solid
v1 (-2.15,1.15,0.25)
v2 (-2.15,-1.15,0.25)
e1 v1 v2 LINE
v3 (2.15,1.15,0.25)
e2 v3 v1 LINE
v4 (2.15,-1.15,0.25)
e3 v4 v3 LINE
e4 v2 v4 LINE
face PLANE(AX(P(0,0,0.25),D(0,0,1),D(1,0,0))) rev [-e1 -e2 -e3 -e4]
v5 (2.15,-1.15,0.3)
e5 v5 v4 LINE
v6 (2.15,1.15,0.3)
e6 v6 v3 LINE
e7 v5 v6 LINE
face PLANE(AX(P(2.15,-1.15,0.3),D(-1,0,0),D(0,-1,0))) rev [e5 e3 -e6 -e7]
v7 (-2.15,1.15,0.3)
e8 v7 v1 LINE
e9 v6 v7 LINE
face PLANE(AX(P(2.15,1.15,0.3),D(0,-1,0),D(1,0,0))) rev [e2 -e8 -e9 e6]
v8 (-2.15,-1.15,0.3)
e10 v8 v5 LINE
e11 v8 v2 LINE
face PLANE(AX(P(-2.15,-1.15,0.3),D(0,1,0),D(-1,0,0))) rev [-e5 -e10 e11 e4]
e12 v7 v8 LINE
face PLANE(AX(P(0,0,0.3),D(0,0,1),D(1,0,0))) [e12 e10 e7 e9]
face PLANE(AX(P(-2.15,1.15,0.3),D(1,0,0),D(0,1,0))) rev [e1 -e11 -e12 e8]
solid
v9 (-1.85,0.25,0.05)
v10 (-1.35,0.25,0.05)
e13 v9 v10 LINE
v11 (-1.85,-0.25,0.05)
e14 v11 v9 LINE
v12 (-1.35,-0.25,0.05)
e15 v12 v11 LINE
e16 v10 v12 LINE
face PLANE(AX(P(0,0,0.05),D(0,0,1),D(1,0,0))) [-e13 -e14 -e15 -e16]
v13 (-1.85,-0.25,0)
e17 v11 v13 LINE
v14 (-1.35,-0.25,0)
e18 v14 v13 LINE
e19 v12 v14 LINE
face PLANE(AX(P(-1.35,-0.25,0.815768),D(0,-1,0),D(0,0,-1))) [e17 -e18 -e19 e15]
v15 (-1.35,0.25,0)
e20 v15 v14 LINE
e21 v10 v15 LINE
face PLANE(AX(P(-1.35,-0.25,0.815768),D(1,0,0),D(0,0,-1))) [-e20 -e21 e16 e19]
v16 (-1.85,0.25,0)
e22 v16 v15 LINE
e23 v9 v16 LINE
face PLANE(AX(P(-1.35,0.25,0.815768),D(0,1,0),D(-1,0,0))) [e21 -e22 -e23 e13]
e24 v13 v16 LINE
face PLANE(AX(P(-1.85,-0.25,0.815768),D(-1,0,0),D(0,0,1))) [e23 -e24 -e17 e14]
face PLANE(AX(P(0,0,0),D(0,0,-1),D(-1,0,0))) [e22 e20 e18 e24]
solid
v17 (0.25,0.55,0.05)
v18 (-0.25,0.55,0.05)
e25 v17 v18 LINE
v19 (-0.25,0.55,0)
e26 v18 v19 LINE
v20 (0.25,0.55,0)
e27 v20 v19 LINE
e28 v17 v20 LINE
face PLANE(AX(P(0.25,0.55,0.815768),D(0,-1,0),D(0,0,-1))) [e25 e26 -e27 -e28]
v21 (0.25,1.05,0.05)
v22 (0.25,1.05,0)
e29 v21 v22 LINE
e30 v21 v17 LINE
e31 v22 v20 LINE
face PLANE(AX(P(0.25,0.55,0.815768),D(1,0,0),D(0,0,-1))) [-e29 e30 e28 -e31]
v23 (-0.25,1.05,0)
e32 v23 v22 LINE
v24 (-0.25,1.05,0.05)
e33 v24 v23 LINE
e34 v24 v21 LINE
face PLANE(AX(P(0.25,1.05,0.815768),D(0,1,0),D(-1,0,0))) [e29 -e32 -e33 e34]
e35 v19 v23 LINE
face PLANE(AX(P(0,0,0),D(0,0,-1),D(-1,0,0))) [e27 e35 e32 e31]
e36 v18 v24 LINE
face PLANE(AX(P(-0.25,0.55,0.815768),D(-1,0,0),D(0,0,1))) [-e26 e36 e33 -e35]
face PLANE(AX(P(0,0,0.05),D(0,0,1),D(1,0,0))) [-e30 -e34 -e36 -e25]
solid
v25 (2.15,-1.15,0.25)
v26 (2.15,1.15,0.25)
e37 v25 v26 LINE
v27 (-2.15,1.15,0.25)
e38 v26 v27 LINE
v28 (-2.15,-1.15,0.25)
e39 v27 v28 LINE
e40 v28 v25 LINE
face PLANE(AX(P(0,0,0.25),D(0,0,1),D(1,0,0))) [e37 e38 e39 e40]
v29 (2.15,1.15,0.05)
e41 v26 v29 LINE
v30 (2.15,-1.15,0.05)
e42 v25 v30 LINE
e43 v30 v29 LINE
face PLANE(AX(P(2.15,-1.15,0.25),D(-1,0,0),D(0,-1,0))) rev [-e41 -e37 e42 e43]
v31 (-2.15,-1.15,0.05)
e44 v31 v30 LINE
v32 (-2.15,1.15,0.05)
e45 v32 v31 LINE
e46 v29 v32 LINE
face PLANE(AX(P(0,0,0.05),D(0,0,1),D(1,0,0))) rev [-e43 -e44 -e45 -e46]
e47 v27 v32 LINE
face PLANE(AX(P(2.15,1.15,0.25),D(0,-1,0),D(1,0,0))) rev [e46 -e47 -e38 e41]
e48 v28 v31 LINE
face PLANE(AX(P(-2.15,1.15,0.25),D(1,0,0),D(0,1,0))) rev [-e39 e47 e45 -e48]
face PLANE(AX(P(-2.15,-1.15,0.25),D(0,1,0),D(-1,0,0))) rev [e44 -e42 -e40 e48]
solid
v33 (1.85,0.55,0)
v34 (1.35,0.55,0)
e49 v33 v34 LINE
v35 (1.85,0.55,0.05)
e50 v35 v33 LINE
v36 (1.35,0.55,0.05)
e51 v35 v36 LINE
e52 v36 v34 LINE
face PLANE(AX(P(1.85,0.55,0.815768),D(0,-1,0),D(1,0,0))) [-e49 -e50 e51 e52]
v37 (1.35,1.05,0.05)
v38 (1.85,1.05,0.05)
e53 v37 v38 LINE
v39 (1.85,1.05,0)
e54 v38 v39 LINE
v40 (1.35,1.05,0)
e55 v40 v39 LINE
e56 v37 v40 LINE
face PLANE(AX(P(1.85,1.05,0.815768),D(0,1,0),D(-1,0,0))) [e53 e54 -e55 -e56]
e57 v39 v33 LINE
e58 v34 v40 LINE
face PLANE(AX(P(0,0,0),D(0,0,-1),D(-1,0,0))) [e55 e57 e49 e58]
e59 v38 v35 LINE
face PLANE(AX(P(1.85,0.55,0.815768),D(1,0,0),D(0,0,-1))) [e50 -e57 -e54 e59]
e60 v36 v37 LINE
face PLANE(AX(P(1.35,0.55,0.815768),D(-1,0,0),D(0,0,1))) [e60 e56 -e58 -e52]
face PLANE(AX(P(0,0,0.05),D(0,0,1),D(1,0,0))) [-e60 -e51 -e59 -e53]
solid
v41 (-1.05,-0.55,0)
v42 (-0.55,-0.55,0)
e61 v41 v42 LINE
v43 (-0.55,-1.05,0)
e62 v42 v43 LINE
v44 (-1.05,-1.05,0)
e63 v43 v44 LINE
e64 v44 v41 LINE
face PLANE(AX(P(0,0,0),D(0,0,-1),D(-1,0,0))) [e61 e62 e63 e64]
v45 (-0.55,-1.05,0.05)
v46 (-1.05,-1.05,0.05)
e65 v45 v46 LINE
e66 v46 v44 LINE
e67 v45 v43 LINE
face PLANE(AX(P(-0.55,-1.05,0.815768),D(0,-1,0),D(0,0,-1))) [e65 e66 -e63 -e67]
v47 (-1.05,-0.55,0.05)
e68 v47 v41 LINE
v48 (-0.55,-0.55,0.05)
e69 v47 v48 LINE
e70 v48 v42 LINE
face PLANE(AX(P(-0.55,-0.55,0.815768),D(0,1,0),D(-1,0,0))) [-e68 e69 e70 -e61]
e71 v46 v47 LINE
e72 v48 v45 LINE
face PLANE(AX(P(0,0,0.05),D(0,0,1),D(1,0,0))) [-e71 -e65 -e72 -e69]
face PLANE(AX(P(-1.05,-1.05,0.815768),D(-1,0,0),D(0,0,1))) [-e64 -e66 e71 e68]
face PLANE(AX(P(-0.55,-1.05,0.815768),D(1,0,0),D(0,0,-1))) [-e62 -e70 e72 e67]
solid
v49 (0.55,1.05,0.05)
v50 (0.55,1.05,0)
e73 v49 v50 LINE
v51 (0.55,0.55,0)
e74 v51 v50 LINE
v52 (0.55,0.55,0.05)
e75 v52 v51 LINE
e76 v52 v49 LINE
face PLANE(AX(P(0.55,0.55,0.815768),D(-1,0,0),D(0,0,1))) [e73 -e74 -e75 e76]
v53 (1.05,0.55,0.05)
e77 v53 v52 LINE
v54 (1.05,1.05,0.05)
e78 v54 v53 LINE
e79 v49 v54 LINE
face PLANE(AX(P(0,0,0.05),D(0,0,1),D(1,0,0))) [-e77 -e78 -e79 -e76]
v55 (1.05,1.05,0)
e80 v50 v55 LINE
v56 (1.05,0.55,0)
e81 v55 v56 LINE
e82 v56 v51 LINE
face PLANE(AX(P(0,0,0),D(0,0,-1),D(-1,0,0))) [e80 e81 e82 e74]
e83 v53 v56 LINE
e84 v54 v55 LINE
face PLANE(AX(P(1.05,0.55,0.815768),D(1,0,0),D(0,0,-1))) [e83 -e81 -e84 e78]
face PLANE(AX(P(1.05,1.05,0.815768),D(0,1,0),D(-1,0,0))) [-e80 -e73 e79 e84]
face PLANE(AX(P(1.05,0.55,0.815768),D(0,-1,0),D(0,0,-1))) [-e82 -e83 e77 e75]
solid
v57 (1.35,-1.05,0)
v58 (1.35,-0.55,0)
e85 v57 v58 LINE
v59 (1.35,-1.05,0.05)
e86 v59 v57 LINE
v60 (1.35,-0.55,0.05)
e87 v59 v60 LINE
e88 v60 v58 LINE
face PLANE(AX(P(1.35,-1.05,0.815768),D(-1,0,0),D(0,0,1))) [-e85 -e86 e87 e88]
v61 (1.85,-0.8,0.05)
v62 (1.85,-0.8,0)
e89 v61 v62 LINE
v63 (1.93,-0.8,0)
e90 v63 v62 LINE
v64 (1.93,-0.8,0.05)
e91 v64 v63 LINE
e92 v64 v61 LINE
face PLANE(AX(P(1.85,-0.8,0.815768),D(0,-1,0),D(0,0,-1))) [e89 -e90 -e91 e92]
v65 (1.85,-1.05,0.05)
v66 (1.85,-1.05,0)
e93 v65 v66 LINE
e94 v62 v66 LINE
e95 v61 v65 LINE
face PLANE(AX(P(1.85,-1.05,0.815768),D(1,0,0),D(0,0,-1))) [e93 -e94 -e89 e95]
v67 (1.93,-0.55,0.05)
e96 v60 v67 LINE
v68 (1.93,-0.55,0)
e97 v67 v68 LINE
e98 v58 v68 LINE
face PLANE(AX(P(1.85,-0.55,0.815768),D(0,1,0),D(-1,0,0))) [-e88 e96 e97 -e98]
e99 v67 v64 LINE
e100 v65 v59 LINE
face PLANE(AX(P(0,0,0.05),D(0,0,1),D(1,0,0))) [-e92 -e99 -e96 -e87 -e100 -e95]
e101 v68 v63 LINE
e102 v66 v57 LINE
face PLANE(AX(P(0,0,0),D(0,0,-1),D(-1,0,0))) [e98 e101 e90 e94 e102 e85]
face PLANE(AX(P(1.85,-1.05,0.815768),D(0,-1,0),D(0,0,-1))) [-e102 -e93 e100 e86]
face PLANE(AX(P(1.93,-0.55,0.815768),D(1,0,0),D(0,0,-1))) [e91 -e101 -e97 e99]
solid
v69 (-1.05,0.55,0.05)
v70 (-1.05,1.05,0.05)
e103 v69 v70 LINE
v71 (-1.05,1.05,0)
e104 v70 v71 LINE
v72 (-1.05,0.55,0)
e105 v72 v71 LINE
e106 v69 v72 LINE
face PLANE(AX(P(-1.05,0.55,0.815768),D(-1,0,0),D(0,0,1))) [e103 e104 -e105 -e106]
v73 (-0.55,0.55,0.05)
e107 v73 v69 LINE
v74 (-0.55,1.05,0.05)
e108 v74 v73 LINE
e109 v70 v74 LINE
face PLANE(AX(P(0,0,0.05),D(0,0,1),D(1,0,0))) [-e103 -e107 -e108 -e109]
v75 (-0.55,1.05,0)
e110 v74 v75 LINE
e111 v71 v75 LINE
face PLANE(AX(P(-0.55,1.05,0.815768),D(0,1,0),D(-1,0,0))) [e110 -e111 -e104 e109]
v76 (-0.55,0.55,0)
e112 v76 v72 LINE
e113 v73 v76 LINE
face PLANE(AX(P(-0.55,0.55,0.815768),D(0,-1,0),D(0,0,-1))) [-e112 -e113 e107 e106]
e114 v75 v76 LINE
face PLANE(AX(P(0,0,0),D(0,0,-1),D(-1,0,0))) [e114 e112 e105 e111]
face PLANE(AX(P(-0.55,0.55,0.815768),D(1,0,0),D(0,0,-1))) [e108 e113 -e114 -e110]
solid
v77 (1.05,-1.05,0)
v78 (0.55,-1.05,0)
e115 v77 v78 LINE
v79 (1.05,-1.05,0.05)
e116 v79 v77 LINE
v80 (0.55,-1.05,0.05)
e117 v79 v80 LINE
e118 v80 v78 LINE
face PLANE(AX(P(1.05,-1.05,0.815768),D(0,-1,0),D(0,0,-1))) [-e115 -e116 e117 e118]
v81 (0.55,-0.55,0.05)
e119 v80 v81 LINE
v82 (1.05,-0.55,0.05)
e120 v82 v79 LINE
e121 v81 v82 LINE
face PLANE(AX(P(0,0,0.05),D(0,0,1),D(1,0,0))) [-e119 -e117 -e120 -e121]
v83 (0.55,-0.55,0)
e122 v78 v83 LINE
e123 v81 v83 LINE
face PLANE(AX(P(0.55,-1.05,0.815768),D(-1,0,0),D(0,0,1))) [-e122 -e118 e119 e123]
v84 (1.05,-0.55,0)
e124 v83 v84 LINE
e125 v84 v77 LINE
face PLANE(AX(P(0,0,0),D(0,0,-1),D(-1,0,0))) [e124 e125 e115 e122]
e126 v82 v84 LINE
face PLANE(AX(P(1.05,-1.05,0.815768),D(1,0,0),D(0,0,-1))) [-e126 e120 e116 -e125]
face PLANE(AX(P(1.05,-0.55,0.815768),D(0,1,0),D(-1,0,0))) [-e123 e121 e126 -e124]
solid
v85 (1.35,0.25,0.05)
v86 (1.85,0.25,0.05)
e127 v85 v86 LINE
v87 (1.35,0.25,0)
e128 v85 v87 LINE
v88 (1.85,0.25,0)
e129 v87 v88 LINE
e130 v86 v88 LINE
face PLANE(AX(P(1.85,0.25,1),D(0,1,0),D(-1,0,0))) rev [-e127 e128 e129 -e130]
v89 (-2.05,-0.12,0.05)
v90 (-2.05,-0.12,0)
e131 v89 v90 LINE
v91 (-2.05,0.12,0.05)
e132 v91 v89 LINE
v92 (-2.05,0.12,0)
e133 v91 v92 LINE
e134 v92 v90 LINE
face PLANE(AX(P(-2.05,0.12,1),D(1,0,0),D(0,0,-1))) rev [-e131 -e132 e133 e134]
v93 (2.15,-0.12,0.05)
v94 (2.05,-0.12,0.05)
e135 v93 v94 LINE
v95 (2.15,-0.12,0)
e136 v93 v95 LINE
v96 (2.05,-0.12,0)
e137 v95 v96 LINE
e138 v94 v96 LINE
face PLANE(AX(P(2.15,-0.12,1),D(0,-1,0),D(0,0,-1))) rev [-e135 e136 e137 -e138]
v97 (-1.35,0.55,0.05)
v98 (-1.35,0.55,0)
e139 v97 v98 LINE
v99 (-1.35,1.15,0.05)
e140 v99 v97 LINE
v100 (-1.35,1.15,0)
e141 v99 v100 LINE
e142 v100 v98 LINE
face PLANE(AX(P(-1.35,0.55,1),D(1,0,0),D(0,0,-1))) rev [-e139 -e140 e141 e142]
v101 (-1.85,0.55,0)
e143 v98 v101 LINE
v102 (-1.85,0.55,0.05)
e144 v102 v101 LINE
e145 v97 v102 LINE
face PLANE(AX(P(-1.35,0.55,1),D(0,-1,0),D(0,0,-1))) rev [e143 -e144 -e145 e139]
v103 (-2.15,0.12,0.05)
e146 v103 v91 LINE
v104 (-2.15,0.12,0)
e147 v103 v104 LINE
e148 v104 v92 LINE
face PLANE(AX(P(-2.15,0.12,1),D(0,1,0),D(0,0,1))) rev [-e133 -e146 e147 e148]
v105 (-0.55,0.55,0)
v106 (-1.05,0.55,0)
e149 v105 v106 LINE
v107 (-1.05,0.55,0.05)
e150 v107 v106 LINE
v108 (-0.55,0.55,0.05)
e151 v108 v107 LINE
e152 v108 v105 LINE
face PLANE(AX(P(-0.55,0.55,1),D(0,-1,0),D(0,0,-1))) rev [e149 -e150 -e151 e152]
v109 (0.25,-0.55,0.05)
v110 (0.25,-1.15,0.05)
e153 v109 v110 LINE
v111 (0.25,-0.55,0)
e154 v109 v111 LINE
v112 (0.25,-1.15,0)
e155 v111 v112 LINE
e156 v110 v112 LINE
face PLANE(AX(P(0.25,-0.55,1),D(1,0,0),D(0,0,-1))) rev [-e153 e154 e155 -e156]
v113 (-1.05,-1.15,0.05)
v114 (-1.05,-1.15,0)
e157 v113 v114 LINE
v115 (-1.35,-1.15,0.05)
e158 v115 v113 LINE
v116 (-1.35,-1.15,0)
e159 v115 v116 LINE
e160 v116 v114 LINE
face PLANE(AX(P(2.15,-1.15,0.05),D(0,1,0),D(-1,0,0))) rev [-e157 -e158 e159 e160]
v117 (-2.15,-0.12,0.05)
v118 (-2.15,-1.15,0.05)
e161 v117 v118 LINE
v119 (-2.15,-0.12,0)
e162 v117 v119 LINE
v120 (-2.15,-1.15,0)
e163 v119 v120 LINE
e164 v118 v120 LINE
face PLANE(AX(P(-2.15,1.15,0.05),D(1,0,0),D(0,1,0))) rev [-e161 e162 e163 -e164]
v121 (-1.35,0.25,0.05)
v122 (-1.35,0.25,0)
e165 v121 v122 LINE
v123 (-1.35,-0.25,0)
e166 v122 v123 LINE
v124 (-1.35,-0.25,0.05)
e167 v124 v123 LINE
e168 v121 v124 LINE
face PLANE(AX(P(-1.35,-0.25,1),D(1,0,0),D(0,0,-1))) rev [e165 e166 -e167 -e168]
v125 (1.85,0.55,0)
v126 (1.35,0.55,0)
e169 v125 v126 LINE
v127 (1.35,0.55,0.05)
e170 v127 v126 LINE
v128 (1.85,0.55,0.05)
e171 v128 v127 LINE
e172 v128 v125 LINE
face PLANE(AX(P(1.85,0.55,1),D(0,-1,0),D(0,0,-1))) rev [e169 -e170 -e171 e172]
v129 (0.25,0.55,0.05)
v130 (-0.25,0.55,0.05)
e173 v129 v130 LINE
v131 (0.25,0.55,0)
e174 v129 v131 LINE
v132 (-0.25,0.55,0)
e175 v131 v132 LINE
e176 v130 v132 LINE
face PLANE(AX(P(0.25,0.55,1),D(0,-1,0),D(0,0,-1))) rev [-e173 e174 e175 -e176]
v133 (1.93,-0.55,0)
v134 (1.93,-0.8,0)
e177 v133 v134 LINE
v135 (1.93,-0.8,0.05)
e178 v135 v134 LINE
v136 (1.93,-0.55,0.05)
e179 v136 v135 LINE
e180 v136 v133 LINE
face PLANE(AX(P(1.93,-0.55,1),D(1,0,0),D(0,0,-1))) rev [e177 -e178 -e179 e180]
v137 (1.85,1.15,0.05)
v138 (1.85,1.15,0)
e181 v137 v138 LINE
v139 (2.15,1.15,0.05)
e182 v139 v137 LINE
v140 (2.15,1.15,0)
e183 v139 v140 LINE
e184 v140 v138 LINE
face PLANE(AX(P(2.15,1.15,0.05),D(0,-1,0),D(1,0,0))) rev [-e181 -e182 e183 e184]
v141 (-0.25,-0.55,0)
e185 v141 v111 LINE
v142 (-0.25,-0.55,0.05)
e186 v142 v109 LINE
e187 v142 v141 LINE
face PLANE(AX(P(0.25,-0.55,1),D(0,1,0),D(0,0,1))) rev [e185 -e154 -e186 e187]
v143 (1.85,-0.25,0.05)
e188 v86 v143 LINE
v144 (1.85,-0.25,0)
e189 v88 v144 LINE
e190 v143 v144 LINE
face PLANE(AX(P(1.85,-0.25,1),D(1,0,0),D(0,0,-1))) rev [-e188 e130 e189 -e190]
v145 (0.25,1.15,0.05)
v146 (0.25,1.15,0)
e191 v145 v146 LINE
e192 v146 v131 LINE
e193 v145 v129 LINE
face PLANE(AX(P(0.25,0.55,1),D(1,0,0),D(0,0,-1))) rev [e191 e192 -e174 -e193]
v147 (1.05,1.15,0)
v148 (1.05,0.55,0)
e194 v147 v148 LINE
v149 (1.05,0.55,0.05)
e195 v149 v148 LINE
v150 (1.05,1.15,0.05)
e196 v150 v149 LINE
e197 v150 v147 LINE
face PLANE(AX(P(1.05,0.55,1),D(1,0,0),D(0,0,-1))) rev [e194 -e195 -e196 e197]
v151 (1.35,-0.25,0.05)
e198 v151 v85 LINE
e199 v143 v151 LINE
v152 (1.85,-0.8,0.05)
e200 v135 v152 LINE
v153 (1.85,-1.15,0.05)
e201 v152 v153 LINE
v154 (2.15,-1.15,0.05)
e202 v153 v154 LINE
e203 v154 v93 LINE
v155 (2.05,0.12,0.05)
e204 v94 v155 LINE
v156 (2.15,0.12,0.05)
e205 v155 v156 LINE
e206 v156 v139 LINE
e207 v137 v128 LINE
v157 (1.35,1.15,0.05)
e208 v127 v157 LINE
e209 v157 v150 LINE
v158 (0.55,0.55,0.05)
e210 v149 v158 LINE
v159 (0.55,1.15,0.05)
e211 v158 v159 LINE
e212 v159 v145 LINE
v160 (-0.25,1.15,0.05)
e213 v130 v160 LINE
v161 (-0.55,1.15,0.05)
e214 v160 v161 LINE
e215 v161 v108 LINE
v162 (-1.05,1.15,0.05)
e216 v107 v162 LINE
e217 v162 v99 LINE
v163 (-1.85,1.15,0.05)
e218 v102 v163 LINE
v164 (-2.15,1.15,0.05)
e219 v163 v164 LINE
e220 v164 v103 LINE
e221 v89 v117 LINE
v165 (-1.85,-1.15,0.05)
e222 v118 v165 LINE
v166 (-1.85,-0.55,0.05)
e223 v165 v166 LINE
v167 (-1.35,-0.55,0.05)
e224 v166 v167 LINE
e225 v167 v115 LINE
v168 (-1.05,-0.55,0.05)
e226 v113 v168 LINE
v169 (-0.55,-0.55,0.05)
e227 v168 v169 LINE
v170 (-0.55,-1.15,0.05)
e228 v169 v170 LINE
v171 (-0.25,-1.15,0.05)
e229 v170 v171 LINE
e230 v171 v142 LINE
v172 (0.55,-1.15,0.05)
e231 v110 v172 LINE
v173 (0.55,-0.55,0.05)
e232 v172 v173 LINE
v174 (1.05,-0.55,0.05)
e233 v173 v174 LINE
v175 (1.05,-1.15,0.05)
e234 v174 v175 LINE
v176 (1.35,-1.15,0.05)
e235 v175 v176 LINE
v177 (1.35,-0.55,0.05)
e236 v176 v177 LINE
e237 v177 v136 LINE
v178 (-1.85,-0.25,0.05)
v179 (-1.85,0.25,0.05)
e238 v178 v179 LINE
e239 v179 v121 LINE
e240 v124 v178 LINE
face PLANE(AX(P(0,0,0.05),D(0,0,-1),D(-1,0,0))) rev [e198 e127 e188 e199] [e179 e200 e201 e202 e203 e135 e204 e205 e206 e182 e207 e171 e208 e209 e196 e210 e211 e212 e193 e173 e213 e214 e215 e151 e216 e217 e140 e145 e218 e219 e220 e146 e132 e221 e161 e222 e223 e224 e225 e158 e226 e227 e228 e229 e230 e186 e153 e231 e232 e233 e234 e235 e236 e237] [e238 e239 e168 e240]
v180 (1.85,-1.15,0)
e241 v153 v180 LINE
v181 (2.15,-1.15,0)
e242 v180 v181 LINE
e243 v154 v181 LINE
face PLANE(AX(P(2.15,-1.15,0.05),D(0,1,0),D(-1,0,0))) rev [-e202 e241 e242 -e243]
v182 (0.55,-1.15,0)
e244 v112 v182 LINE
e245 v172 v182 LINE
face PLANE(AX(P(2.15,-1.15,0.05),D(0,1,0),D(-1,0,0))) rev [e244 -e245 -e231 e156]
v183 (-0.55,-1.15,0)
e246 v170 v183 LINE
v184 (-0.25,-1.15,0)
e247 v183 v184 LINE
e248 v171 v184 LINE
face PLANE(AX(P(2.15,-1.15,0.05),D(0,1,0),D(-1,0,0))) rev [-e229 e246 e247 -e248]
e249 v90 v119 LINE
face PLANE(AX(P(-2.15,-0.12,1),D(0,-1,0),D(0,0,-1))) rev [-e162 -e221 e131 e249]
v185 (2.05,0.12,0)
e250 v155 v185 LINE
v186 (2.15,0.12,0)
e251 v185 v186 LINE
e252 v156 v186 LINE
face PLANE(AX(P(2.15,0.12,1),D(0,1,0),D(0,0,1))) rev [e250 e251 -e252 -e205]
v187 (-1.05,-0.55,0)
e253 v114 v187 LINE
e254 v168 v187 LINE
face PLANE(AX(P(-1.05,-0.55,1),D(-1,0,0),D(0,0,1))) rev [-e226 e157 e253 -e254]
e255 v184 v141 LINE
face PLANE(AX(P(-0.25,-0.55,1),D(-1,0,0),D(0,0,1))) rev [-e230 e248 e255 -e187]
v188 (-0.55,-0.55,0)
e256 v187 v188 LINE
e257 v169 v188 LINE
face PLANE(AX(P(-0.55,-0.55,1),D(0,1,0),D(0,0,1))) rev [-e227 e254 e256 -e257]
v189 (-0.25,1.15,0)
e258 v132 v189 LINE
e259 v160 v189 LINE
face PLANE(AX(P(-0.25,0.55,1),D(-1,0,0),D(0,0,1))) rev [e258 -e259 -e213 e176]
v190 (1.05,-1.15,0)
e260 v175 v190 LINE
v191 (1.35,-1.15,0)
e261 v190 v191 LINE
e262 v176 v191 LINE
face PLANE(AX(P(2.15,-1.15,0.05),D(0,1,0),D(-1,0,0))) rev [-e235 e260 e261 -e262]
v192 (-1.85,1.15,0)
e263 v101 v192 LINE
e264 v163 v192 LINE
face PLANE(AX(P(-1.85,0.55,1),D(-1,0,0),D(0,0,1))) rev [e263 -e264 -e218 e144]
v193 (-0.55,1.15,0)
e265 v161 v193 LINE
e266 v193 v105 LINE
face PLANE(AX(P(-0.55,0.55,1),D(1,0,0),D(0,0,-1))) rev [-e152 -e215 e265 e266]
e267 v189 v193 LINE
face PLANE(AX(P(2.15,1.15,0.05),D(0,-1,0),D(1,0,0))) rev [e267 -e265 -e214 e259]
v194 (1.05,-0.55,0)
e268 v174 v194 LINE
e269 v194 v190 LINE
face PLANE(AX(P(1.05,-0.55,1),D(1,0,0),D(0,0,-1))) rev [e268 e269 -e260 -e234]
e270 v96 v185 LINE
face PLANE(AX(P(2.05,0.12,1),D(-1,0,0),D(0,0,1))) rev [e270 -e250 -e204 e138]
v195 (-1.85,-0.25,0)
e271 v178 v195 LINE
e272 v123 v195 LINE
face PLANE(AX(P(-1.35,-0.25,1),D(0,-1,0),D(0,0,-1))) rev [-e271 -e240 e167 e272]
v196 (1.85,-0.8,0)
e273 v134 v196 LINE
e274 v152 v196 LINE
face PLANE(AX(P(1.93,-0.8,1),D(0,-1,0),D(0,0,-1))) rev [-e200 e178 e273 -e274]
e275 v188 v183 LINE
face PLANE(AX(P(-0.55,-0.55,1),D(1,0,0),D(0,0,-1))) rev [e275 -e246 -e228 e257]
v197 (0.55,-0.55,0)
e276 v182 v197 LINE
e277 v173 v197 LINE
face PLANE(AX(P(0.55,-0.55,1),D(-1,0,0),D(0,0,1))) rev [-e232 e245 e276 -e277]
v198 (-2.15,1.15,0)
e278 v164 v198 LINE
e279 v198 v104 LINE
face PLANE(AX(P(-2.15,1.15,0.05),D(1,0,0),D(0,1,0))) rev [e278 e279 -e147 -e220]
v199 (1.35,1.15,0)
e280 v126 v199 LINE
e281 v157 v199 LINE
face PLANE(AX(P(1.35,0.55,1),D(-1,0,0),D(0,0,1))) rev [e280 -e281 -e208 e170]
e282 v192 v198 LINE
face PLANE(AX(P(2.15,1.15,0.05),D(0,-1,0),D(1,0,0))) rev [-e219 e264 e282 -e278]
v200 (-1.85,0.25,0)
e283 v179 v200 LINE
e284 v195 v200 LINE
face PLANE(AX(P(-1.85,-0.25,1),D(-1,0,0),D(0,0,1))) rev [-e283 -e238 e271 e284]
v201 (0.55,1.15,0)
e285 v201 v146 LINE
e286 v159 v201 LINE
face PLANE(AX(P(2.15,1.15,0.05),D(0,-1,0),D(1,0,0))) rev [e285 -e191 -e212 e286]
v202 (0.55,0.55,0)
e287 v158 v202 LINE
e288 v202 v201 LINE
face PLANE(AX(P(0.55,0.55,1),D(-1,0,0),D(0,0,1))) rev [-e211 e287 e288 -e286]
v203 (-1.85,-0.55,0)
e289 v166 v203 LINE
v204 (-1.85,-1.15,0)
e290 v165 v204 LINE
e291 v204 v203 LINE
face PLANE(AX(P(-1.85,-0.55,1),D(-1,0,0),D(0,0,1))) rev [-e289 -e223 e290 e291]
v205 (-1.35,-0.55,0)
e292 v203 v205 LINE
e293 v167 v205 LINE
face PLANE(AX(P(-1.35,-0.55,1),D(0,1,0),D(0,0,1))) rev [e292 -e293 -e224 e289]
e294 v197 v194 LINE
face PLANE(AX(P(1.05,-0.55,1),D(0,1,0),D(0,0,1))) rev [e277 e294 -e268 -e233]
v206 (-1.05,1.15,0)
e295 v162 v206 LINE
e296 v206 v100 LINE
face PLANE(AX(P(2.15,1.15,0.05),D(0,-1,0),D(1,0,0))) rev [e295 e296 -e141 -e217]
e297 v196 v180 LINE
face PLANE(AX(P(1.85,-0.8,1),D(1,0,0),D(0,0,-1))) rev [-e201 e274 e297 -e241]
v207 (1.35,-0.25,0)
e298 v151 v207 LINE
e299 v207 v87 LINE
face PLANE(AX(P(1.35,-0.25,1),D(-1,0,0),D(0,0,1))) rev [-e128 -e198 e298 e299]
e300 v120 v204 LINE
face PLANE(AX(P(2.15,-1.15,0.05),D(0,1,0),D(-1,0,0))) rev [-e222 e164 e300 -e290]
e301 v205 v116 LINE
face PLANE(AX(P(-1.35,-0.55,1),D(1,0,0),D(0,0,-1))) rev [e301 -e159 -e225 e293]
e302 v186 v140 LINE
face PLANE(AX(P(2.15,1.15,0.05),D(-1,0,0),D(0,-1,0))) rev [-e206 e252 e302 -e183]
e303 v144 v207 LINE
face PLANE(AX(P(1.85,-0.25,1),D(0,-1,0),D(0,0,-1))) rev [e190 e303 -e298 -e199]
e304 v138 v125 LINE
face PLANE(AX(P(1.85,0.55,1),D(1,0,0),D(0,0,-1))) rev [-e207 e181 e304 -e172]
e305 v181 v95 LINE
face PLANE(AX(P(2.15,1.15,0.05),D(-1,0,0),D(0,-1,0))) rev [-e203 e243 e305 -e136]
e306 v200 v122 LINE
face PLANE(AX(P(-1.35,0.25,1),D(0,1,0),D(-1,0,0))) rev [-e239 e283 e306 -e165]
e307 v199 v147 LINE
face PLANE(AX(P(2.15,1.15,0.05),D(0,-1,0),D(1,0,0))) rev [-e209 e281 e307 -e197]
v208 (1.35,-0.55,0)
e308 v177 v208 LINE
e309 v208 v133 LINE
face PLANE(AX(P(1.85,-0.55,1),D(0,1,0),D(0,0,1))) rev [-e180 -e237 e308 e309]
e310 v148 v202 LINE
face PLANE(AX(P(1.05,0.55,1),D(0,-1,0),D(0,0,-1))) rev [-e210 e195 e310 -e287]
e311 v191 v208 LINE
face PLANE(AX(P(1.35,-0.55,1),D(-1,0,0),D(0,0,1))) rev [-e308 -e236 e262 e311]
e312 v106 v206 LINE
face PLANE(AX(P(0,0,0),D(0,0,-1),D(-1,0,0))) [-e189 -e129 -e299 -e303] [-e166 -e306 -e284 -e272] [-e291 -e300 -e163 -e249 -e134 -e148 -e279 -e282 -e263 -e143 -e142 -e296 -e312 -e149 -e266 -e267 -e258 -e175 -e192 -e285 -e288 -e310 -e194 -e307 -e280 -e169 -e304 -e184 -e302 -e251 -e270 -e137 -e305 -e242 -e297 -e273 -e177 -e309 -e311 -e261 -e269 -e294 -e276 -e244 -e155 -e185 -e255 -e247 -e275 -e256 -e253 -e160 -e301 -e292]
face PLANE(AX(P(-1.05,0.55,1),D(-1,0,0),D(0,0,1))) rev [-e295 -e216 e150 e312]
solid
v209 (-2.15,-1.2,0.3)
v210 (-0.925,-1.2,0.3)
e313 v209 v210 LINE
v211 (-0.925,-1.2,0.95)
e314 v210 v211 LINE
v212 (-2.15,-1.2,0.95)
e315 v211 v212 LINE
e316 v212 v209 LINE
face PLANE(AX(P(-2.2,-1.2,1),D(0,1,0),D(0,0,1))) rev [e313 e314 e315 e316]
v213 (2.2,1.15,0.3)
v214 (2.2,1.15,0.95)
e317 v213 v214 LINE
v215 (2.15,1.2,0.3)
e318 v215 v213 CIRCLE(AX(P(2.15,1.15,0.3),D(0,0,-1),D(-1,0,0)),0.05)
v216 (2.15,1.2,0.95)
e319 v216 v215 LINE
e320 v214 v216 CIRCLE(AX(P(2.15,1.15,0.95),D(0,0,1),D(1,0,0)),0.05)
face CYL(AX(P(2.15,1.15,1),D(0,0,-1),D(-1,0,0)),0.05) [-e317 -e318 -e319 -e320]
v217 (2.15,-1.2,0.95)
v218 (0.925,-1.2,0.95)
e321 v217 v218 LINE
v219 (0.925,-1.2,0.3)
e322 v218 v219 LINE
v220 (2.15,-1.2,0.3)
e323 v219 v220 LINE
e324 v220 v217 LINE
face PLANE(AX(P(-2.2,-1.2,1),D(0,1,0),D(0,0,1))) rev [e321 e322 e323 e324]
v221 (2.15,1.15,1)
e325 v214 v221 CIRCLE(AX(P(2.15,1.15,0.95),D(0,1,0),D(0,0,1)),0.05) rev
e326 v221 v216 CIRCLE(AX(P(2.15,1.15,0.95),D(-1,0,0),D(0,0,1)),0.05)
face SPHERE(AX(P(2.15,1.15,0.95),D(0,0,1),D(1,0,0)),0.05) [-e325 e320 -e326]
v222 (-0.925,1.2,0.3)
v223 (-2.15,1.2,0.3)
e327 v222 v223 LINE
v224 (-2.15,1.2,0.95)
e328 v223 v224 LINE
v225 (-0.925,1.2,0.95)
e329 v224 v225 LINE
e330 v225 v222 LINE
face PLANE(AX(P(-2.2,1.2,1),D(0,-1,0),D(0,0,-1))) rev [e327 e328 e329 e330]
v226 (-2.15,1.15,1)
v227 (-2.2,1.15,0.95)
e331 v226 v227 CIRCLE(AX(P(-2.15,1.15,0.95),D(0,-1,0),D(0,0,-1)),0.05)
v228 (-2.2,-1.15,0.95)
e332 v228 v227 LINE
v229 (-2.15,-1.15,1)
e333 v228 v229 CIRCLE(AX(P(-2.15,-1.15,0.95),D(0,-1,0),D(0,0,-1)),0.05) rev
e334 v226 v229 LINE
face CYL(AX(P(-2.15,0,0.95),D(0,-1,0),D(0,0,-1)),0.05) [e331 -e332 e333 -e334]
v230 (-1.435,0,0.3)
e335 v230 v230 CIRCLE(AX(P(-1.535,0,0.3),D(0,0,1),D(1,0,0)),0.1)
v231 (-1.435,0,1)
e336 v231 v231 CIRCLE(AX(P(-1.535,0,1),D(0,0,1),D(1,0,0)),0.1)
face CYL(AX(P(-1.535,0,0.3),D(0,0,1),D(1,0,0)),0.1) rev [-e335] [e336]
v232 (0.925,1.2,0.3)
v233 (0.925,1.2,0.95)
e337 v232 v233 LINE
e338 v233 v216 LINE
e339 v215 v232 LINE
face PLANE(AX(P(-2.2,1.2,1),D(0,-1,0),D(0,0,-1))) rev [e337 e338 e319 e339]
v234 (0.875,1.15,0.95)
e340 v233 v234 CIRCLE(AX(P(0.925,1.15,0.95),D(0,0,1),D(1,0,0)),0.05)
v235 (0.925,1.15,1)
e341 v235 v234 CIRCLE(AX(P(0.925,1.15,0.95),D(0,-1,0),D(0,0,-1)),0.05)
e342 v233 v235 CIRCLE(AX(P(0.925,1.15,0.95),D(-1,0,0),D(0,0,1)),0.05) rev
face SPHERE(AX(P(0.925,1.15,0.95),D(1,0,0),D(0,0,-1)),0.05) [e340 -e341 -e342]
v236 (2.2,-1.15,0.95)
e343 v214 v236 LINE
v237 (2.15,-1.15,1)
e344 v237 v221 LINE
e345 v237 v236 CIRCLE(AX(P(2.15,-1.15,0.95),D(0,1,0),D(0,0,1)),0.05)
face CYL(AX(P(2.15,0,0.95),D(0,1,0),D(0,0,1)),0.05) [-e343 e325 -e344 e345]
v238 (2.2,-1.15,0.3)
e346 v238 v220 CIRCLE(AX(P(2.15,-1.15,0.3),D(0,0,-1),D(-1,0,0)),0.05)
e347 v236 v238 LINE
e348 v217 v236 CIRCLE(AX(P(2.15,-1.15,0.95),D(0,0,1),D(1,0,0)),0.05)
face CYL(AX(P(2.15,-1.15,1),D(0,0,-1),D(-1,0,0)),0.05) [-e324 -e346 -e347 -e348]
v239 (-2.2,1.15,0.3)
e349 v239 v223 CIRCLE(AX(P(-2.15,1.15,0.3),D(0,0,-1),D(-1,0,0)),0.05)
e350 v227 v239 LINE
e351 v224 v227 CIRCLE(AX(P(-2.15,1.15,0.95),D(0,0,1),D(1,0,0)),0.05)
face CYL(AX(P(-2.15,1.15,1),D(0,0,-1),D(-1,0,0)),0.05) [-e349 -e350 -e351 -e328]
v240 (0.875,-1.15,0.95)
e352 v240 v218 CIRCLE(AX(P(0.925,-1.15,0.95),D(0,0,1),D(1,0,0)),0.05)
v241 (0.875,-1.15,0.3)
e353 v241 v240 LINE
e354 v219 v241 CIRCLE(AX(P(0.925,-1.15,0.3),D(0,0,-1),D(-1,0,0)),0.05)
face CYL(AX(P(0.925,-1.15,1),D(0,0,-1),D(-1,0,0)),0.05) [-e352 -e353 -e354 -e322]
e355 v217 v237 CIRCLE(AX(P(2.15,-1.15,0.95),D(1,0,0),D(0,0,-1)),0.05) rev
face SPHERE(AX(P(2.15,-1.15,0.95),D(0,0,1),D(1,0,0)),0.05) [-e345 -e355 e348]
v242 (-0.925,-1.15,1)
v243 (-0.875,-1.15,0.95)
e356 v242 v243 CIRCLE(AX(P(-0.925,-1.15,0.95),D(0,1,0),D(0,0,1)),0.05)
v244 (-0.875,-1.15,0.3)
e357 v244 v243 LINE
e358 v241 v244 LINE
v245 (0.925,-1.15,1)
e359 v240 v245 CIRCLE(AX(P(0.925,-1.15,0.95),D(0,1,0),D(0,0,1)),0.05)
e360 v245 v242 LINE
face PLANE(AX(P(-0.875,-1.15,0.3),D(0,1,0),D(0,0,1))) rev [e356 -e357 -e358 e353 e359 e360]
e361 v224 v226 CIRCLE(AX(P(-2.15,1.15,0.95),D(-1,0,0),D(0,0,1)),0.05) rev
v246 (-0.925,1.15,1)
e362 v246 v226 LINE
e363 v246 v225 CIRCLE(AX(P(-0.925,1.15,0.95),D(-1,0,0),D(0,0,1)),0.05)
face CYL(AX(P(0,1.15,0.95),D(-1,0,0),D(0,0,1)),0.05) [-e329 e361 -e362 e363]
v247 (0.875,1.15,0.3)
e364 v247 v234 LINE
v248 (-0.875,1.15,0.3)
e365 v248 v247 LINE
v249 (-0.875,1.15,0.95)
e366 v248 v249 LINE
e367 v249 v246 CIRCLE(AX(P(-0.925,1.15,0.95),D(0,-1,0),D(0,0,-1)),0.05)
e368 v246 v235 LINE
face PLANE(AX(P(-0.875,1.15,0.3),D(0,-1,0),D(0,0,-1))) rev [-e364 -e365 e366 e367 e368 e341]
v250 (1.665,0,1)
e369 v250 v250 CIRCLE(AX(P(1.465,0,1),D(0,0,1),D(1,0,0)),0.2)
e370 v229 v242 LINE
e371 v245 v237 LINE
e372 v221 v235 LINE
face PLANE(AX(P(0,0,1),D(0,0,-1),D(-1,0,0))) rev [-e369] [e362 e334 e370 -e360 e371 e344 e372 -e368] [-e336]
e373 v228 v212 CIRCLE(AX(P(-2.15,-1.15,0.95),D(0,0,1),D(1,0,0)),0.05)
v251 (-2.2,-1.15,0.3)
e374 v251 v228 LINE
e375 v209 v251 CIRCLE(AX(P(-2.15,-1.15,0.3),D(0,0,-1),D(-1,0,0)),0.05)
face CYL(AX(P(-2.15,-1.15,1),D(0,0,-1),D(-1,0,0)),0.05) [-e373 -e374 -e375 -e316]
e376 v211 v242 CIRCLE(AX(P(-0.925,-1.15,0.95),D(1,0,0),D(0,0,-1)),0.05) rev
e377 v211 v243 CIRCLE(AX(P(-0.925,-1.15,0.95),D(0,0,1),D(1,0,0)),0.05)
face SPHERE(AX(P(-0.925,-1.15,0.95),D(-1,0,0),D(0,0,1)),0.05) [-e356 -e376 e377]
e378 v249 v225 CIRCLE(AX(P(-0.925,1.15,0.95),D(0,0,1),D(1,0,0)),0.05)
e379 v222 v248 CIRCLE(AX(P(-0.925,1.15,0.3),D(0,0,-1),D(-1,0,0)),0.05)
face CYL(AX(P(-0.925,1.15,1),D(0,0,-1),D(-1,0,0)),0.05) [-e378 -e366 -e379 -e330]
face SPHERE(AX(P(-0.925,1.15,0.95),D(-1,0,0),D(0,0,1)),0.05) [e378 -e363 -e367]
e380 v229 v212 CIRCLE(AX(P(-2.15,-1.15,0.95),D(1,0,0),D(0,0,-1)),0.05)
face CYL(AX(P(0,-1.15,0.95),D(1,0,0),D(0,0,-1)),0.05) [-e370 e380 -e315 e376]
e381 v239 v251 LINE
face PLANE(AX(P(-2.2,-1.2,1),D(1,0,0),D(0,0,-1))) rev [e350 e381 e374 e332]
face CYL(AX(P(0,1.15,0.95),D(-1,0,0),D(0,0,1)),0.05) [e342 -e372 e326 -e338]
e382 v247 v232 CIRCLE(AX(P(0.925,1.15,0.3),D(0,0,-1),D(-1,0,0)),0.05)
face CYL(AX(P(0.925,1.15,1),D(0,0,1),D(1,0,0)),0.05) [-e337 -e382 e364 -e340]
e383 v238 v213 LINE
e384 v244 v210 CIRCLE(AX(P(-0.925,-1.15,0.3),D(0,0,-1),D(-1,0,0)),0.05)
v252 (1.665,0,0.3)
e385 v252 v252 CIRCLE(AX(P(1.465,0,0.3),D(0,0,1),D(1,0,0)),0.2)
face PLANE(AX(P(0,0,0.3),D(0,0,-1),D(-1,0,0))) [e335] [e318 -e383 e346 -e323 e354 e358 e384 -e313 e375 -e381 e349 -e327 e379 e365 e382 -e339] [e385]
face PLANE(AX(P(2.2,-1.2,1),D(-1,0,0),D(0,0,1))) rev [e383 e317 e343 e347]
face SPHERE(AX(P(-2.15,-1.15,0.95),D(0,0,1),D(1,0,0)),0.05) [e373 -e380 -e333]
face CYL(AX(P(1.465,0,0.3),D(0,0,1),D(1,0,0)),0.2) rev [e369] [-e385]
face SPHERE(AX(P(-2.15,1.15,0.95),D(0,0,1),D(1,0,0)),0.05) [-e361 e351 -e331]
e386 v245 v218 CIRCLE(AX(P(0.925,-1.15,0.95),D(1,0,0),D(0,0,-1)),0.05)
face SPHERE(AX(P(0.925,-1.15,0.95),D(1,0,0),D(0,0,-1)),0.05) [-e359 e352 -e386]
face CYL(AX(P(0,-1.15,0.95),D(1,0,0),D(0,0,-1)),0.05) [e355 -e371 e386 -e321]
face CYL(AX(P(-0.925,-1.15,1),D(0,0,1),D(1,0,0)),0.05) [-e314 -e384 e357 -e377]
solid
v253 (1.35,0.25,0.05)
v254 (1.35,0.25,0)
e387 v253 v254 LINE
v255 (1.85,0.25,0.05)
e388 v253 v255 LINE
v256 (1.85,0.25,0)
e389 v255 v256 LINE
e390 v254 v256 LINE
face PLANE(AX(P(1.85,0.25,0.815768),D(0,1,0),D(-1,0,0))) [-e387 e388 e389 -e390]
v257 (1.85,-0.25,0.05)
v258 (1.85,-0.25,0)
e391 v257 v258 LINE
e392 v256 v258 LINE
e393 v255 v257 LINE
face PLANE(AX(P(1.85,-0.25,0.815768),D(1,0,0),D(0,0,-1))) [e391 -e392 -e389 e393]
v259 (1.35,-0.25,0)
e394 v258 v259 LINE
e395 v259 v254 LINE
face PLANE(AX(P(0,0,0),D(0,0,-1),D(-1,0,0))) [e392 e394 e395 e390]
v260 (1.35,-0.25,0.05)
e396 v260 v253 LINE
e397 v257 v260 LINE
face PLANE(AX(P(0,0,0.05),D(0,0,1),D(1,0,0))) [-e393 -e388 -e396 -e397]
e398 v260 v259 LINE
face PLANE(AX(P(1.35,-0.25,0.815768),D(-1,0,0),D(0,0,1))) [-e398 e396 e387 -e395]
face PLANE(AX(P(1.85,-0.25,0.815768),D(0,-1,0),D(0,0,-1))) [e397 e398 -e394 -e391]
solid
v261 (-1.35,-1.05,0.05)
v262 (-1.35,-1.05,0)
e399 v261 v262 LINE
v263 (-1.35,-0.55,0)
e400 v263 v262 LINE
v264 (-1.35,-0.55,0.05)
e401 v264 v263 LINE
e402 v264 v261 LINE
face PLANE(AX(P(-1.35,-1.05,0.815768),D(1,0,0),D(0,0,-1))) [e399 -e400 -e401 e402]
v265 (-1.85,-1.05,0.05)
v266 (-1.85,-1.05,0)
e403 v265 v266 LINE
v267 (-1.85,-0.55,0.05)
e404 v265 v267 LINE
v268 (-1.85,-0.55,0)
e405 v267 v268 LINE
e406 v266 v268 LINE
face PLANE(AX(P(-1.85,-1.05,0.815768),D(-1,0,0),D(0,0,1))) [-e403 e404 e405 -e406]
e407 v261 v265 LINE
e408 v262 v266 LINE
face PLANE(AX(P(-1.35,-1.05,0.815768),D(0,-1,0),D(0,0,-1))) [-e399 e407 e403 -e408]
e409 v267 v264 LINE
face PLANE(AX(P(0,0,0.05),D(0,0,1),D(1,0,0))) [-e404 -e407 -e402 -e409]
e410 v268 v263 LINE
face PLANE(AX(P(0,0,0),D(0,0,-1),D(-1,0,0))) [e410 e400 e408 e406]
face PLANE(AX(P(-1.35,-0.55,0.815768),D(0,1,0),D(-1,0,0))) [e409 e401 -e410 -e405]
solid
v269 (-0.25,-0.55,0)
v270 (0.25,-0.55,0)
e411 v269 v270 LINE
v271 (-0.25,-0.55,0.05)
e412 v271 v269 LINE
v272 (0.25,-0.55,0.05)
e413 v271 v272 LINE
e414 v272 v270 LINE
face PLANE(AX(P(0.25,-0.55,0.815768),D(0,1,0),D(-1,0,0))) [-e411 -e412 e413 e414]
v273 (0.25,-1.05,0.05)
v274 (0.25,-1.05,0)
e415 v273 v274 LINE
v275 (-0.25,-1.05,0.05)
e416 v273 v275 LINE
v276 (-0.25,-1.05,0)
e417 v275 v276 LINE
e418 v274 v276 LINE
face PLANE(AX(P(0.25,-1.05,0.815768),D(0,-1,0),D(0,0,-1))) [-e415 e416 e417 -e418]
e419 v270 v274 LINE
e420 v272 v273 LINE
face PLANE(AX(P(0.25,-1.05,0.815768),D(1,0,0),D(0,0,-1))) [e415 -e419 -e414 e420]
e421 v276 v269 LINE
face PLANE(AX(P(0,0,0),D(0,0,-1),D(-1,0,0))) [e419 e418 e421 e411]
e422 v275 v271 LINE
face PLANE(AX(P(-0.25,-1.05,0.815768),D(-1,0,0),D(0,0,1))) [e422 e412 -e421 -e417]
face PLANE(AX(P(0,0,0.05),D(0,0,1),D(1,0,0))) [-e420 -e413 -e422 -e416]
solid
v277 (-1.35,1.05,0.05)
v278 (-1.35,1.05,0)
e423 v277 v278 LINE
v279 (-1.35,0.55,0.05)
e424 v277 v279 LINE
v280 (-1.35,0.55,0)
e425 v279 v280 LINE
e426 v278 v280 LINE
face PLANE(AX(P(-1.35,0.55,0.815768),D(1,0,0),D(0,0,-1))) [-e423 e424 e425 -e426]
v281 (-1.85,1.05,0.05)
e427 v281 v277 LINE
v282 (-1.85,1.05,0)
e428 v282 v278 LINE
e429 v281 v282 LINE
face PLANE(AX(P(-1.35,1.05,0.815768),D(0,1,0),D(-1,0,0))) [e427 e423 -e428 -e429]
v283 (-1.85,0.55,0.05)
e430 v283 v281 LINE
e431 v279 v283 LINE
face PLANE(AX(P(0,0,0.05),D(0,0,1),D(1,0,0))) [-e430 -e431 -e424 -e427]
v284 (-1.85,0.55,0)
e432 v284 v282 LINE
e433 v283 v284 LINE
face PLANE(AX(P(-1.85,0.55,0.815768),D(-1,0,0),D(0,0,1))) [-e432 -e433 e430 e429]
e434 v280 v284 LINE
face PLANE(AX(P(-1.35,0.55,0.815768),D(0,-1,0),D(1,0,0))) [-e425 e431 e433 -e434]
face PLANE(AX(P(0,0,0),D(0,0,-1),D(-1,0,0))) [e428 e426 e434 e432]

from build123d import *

# Parameters (mm, degrees)
SKETCH1_W              = 4.3
SKETCH1_H              = 2.3
BOSS_EXTRUDE1_DEPTH    = 0.05
SKETCH2_W              = 4.3
SKETCH2_H              = 2.3
BOSS_EXTRUDE2_DEPTH    = 0.2
SKETCH3_W              = 4.3
SKETCH3_H              = 2.3
BOSS_EXTRUDE3_DEPTH    = 0.05
SKETCH4_W              = 4.4
SKETCH4_H              = 2.4
BOSS_EXTRUDE4_DEPTH    = 0.7
FILLET3_R              = 0.05
SKETCH6_W              = 1.75
SKETCH6_H              = 0.1
CUT_EXTRUDE1_DEPTH     = 0.7
FILLET1_R              = 0.05
SKETCH7_R              = 0.1
SKETCH7_R_2            = 0.2
CUT_EXTRUDE2_DEPTH     = 0.7
SKETCH9_W              = 0.5
SKETCH9_H              = 0.6
SKETCH9_H_2            = 0.5
SKETCH9_W_2            = 0.1
SKETCH9_H_3            = 0.24
CUT_EXTRUDE3_DEPTH     = 3.698147513
SKETCH8_W              = 0.5
SKETCH8_H              = 0.5
BOSS_EXTRUDE5_DEPTH    = 0.05
BOSS_EXTRUDE5_2_DEPTH  = 0.05
BOSS_EXTRUDE5_3_DEPTH  = 0.05
BOSS_EXTRUDE5_4_DEPTH  = 0.05
BOSS_EXTRUDE5_5_DEPTH  = 0.05
BOSS_EXTRUDE5_6_DEPTH  = 0.05
BOSS_EXTRUDE5_7_DEPTH  = 0.05
BOSS_EXTRUDE5_8_DEPTH  = 0.05
BOSS_EXTRUDE5_9_DEPTH  = 0.05
BOSS_EXTRUDE5_10_DEPTH = 0.05
BOSS_EXTRUDE5_11_DEPTH = 0.05
BOSS_EXTRUDE5_12_DEPTH = 0.05


with BuildPart() as part:
    # Sketch1 → Boss-Extrude1 (new body)
    with BuildSketch(Plane.XY):
        Rectangle(SKETCH1_W, SKETCH1_H)
    extrude(amount=BOSS_EXTRUDE1_DEPTH)

    # Sketch9 → Cut-Extrude3 (cut, through all)
    with BuildSketch(Plane(origin=(0, 0, 0), x_dir=(-1, 0, 0), z_dir=(0, 0, -1))):
        with Locations((-1.6, 0.85)):
            Rectangle(SKETCH9_W, SKETCH9_H)
        with Locations((-0.8, 0.85)):
            Rectangle(SKETCH9_W, SKETCH9_H)
        with Locations((0, 0.85)):
            Rectangle(SKETCH9_W, SKETCH9_H)
        with Locations((0.8, 0.85)):
            Rectangle(SKETCH9_W, SKETCH9_H)
        with Locations((1.6, 0.85)):
            Rectangle(SKETCH9_W, SKETCH9_H)
        Polygon((-1.85, -0.55), (-1.35, -0.55), (-1.35, -1.15), (-1.85, -1.15), (-1.85, -0.8), (-1.93, -0.8), (-1.93, -0.55), align=None)
        with Locations((-0.8, -0.85)):
            Rectangle(SKETCH9_W, SKETCH9_H)
        with Locations((0, -0.85)):
            Rectangle(SKETCH9_W, SKETCH9_H)
        with Locations((0.8, -0.85)):
            Rectangle(SKETCH9_W, SKETCH9_H)
        with Locations((1.6, -0.85)):
            Rectangle(SKETCH9_W, SKETCH9_H)
        with Locations((-1.6, 0)):
            Rectangle(SKETCH9_W, SKETCH9_H_2)
        with Locations((1.6, 0)):
            Rectangle(SKETCH9_W, SKETCH9_H_2)
        with Locations((-2.1, 0)):
            Rectangle(SKETCH9_W_2, SKETCH9_H_3)
        with Locations((2.1, 0)):
            Rectangle(SKETCH9_W_2, SKETCH9_H_3)
    extrude(amount=-CUT_EXTRUDE3_DEPTH, mode=Mode.SUBTRACT)


with BuildPart() as body_2:
    # Sketch2 → Boss-Extrude2 (new body)
    with BuildSketch(Plane.XY.offset(0.05)):
        Rectangle(SKETCH2_W, SKETCH2_H)
    extrude(amount=BOSS_EXTRUDE2_DEPTH)


with BuildPart() as body_3:
    # Sketch3 → Boss-Extrude3 (new body)
    with BuildSketch(Plane.XY.offset(0.25)):
        Rectangle(SKETCH3_W, SKETCH3_H)
    extrude(amount=BOSS_EXTRUDE3_DEPTH)


with BuildPart() as body_4:
    # Sketch4 → Boss-Extrude4 (new body)
    with BuildSketch(Plane.XY.offset(0.3)):
        Rectangle(SKETCH4_W, SKETCH4_H)
    extrude(amount=BOSS_EXTRUDE4_DEPTH)

    # Fillet3
    fillet3_edges = [body_4.edges().sort_by_distance(p)[0] for p in [
        (-2.2, 0, 1),
        (0, -1.2, 1),
        (2.2, 0, 1),
        (0, 1.2, 1),
    ]]
    fillet(fillet3_edges, radius=FILLET3_R)

    # Sketch6 → Cut-Extrude1 (cut)
    with BuildSketch(Plane.XY.offset(1)):
        with Locations((0, 1.2)):
            Rectangle(SKETCH6_W, SKETCH6_H)
        with Locations((0, -1.2)):
            Rectangle(SKETCH6_W, SKETCH6_H)
    extrude(amount=-CUT_EXTRUDE1_DEPTH, mode=Mode.SUBTRACT)

    # Fillet1
    # the kernel refuses this fillet: 0.05 mm, written as the material it takes off along each edge
    with BuildSketch(Plane(origin=(2.15, 1.15, 0.95), x_dir=(1, 0, 0), z_dir=(0, 1, 0))) as fillet1_piece_1_section:
        Polygon((0, 0), (FILLET1_R, 0), (FILLET1_R, -FILLET1_R), (0, -FILLET1_R), align=None)
    fillet1_piece_1 = extrude(amount=FILLET1_R, mode=Mode.PRIVATE)
    fillet1_piece_1 = fillet1_piece_1 - Plane(origin=(2.15, 1.15, 0.95), x_dir=(-0.7071067811865475, 0, -0.7071067811865475), z_dir=(0, 1, 0)) * Sphere(FILLET1_R, mode=Mode.PRIVATE)
    add(fillet1_piece_1, mode=Mode.SUBTRACT)
    with BuildSketch(Plane(origin=(2.15, -1.15, 0.95), x_dir=(0, -1, 0), z_dir=(1, 0, 0))) as fillet1_piece_2_section:
        Polygon((0, 0), (FILLET1_R, 0), (FILLET1_R, -FILLET1_R), (0, -FILLET1_R), align=None)
    fillet1_piece_2 = extrude(amount=FILLET1_R, mode=Mode.PRIVATE)
    fillet1_piece_2 = fillet1_piece_2 - Plane(origin=(2.15, -1.15, 0.95), x_dir=(0, 0.7071067811865475, -0.7071067811865475), z_dir=(1, 0, 0)) * Sphere(FILLET1_R, mode=Mode.PRIVATE)
    add(fillet1_piece_2, mode=Mode.SUBTRACT)
    with BuildSketch(Plane(origin=(-2.15, 1.15, 0.95), x_dir=(0, 1, 0), z_dir=(-1, 0, 0))) as fillet1_piece_3_section:
        Polygon((0, 0), (FILLET1_R, 0), (FILLET1_R, -FILLET1_R), (0, -FILLET1_R), align=None)
    fillet1_piece_3 = extrude(amount=FILLET1_R, mode=Mode.PRIVATE)
    fillet1_piece_3 = fillet1_piece_3 - Plane(origin=(-2.15, 1.15, 0.95), x_dir=(0, -0.7071067811865475, -0.7071067811865475), z_dir=(-1, 0, 0)) * Sphere(FILLET1_R, mode=Mode.PRIVATE)
    add(fillet1_piece_3, mode=Mode.SUBTRACT)
    with BuildSketch(Plane(origin=(-2.15, -1.15, 0.95), x_dir=(-1, 0, 0), z_dir=(0, -1, 0))) as fillet1_piece_4_section:
        Polygon((0, 0), (FILLET1_R, 0), (FILLET1_R, -FILLET1_R), (0, -FILLET1_R), align=None)
    fillet1_piece_4 = extrude(amount=FILLET1_R, mode=Mode.PRIVATE)
    fillet1_piece_4 = fillet1_piece_4 - Plane(origin=(-2.15, -1.15, 0.95), x_dir=(0.7071067811865475, 0, -0.7071067811865475), z_dir=(0, -1, 0)) * Sphere(FILLET1_R, mode=Mode.PRIVATE)
    add(fillet1_piece_4, mode=Mode.SUBTRACT)
    with BuildSketch(Plane(origin=(2.2, 1.2, 0.175), x_dir=(-1, 0, 0), z_dir=(0, 0, 1)), Plane(origin=(2.2, -1.2, 0.175), x_dir=(0, 1, 0), z_dir=(0, 0, 1)), Plane(origin=(0.875, -1.2, 0.175), x_dir=(1, 0, 0), z_dir=(0, 0, 1)), Plane(origin=(-0.875, -1.2, 0.95), x_dir=(-1, 0, 0), z_dir=(0, 0, -1)), Plane(origin=(-2.2, 1.2, 0.175), x_dir=(0, -1, 0), z_dir=(0, 0, 1)), Plane(origin=(0.875, 1.2, 0.175), x_dir=(0, -1, 0), z_dir=(0, 0, 1)), Plane(origin=(-2.2, -1.2, 0.175), x_dir=(1, 0, 0), z_dir=(0, 0, 1))) as fillet1_piece_5:
        with BuildLine():
            CenterArc((FILLET1_R, FILLET1_R), FILLET1_R, 180, 90)
            Line((0, FILLET1_R), (0, 0))
            Line((0, 0), (FILLET1_R, 0))
        make_face()
    extrude(amount=0.775, mode=Mode.SUBTRACT)
    with BuildSketch(Plane(origin=(-0.875, 1.2, 0.95), x_dir=(-1, 0, 0), z_dir=(0, 0, -1))) as fillet1_piece_6:
        with BuildLine():
            CenterArc((FILLET1_R, -FILLET1_R), FILLET1_R, 90, 90)
            Line((0, -FILLET1_R), (0, 0))
            Line((0, 0), (FILLET1_R, 0))
        make_face()
    extrude(amount=0.775, mode=Mode.SUBTRACT)
    with BuildSketch(Plane(origin=(0.875, -1.15, 0.95), x_dir=(0, 0, 1), z_dir=(0, 1, 0))) as fillet1_piece_7:
        with BuildLine():
            CenterArc((0.05 - FILLET1_R, FILLET1_R), FILLET1_R, 270, 90)
            Line((0.05, FILLET1_R), (0.05, 0))
            Line((0.05, 0), (0.05 - FILLET1_R, 0))
        make_face()
    revolve(axis=Axis((0.875, -1.15, 0.95), (1, 0, 0)), revolution_arc=90, mode=Mode.SUBTRACT)
    with BuildSketch(Plane(origin=(-0.875, -1.15, 0.95), x_dir=(0, 0, 1), z_dir=(0, 1, 0))) as fillet1_piece_8:
        with BuildLine():
            CenterArc((0.05 - FILLET1_R, -FILLET1_R), FILLET1_R, 360, 90)
            Line((0.05, -FILLET1_R), (0.05, 0))
            Line((0.05, 0), (0.05 - FILLET1_R, 0))
        make_face()
    revolve(axis=Axis((-0.875, -1.15, 0.95), (1, 0, 0)), revolution_arc=90, mode=Mode.SUBTRACT)
    with BuildSketch(Plane(origin=(-0.875, 1.15, 0.95), x_dir=(0, 0, 1), z_dir=(0, -1, 0))) as fillet1_piece_9:
        with BuildLine():
            CenterArc((0.05 - FILLET1_R, FILLET1_R), FILLET1_R, 270, 90)
            Line((0.05, FILLET1_R), (0.05, 0))
            Line((0.05, 0), (0.05 - FILLET1_R, 0))
        make_face()
    revolve(axis=Axis((-0.875, 1.15, 0.95), (-1, 0, 0)), revolution_arc=90, mode=Mode.SUBTRACT)
    with BuildSketch(Plane(origin=(0.875, 1.15, 0.95), x_dir=(0, 0, 1), z_dir=(0, -1, 0))) as fillet1_piece_10:
        with BuildLine():
            CenterArc((0.05 - FILLET1_R, -FILLET1_R), FILLET1_R, 0, 90)
            Line((0.05, -FILLET1_R), (0.05, 0))
            Line((0.05, 0), (0.05 - FILLET1_R, 0))
        make_face()
    revolve(axis=Axis((0.875, 1.15, 0.95), (-1, 0, 0)), revolution_arc=90, mode=Mode.SUBTRACT)

    # Sketch7 → Cut-Extrude2 (cut)
    with BuildSketch(Plane.XY.offset(1)):
        with Locations((-1.535, 0)):
            Circle(SKETCH7_R)
        with Locations((1.465, 0)):
            Circle(SKETCH7_R_2)
    extrude(amount=-CUT_EXTRUDE2_DEPTH, mode=Mode.SUBTRACT)


with BuildPart() as body_5:
    # Sketch8 → Boss-Extrude5 (new body)
    with BuildSketch(Plane(origin=(0, 0, 0), x_dir=(-1, 0, 0), z_dir=(0, 0, -1))):
        with Locations((-0.8, -0.8)):
            Rectangle(SKETCH8_W, SKETCH8_H)
    extrude(amount=-BOSS_EXTRUDE5_DEPTH)


with BuildPart() as body_6:
    # Sketch8 → Boss-Extrude5 2 (new body)
    with BuildSketch(Plane(origin=(0, 0, 0), x_dir=(-1, 0, 0), z_dir=(0, 0, -1))):
        Polygon((-1.85, -1.05), (-1.35, -1.05), (-1.35, -0.55), (-1.85, -0.55), (-1.93, -0.55), (-1.93, -0.8), (-1.85, -0.8), align=None)
    extrude(amount=-BOSS_EXTRUDE5_2_DEPTH)


with BuildPart() as body_7:
    # Sketch8 → Boss-Extrude5 3 (new body)
    with BuildSketch(Plane(origin=(0, 0, 0), x_dir=(-1, 0, 0), z_dir=(0, 0, -1))):
        with Locations((0, -0.8)):
            Rectangle(SKETCH8_W, SKETCH8_H)
    extrude(amount=-BOSS_EXTRUDE5_3_DEPTH)


with BuildPart() as body_8:
    # Sketch8 → Boss-Extrude5 4 (new body)
    with BuildSketch(Plane(origin=(0, 0, 0), x_dir=(-1, 0, 0), z_dir=(0, 0, -1))):
        with Locations((0.8, -0.8)):
            Rectangle(SKETCH8_W, SKETCH8_H)
    extrude(amount=-BOSS_EXTRUDE5_4_DEPTH)


with BuildPart() as body_9:
    # Sketch8 → Boss-Extrude5 5 (new body)
    with BuildSketch(Plane(origin=(0, 0, 0), x_dir=(-1, 0, 0), z_dir=(0, 0, -1))):
        with Locations((1.6, -0.8)):
            Rectangle(SKETCH8_W, SKETCH8_H)
    extrude(amount=-BOSS_EXTRUDE5_5_DEPTH)


with BuildPart() as body_10:
    # Sketch8 → Boss-Extrude5 6 (new body)
    with BuildSketch(Plane(origin=(0, 0, 0), x_dir=(-1, 0, 0), z_dir=(0, 0, -1))):
        with Locations((1.6, 0)):
            Rectangle(SKETCH8_W, SKETCH8_H)
    extrude(amount=-BOSS_EXTRUDE5_6_DEPTH)


with BuildPart() as body_11:
    # Sketch8 → Boss-Extrude5 7 (new body)
    with BuildSketch(Plane(origin=(0, 0, 0), x_dir=(-1, 0, 0), z_dir=(0, 0, -1))):
        with Locations((-0.8, 0.8)):
            Rectangle(SKETCH8_W, SKETCH8_H)
    extrude(amount=-BOSS_EXTRUDE5_7_DEPTH)


with BuildPart() as body_12:
    # Sketch8 → Boss-Extrude5 8 (new body)
    with BuildSketch(Plane(origin=(0, 0, 0), x_dir=(-1, 0, 0), z_dir=(0, 0, -1))):
        with Locations((0, 0.8)):
            Rectangle(SKETCH8_W, SKETCH8_H)
    extrude(amount=-BOSS_EXTRUDE5_8_DEPTH)


with BuildPart() as body_13:
    # Sketch8 → Boss-Extrude5 9 (new body)
    with BuildSketch(Plane(origin=(0, 0, 0), x_dir=(-1, 0, 0), z_dir=(0, 0, -1))):
        with Locations((0.8, 0.8)):
            Rectangle(SKETCH8_W, SKETCH8_H)
    extrude(amount=-BOSS_EXTRUDE5_9_DEPTH)


with BuildPart() as body_14:
    # Sketch8 → Boss-Extrude5 10 (new body)
    with BuildSketch(Plane(origin=(0, 0, 0), x_dir=(-1, 0, 0), z_dir=(0, 0, -1))):
        with Locations((1.6, 0.8)):
            Rectangle(SKETCH8_W, SKETCH8_H)
    extrude(amount=-BOSS_EXTRUDE5_10_DEPTH)


with BuildPart() as body_15:
    # Sketch8 → Boss-Extrude5 11 (new body)
    with BuildSketch(Plane(origin=(0, 0, 0), x_dir=(-1, 0, 0), z_dir=(0, 0, -1))):
        with Locations((-1.6, 0)):
            Rectangle(SKETCH8_W, SKETCH8_H)
    extrude(amount=-BOSS_EXTRUDE5_11_DEPTH)


with BuildPart() as body_16:
    # Sketch8 → Boss-Extrude5 12 (new body)
    with BuildSketch(Plane(origin=(0, 0, 0), x_dir=(-1, 0, 0), z_dir=(0, 0, -1))):
        with Locations((-1.6, 0.8)):
            Rectangle(SKETCH8_W, SKETCH8_H)
    extrude(amount=-BOSS_EXTRUDE5_12_DEPTH)


solid = Compound([part.part, body_2.part, body_3.part, body_4.part, body_5.part, body_6.part, body_7.part, body_8.part, body_9.part, body_10.part, body_11.part, body_12.part, body_13.part, body_14.part, body_15.part, body_16.part])
